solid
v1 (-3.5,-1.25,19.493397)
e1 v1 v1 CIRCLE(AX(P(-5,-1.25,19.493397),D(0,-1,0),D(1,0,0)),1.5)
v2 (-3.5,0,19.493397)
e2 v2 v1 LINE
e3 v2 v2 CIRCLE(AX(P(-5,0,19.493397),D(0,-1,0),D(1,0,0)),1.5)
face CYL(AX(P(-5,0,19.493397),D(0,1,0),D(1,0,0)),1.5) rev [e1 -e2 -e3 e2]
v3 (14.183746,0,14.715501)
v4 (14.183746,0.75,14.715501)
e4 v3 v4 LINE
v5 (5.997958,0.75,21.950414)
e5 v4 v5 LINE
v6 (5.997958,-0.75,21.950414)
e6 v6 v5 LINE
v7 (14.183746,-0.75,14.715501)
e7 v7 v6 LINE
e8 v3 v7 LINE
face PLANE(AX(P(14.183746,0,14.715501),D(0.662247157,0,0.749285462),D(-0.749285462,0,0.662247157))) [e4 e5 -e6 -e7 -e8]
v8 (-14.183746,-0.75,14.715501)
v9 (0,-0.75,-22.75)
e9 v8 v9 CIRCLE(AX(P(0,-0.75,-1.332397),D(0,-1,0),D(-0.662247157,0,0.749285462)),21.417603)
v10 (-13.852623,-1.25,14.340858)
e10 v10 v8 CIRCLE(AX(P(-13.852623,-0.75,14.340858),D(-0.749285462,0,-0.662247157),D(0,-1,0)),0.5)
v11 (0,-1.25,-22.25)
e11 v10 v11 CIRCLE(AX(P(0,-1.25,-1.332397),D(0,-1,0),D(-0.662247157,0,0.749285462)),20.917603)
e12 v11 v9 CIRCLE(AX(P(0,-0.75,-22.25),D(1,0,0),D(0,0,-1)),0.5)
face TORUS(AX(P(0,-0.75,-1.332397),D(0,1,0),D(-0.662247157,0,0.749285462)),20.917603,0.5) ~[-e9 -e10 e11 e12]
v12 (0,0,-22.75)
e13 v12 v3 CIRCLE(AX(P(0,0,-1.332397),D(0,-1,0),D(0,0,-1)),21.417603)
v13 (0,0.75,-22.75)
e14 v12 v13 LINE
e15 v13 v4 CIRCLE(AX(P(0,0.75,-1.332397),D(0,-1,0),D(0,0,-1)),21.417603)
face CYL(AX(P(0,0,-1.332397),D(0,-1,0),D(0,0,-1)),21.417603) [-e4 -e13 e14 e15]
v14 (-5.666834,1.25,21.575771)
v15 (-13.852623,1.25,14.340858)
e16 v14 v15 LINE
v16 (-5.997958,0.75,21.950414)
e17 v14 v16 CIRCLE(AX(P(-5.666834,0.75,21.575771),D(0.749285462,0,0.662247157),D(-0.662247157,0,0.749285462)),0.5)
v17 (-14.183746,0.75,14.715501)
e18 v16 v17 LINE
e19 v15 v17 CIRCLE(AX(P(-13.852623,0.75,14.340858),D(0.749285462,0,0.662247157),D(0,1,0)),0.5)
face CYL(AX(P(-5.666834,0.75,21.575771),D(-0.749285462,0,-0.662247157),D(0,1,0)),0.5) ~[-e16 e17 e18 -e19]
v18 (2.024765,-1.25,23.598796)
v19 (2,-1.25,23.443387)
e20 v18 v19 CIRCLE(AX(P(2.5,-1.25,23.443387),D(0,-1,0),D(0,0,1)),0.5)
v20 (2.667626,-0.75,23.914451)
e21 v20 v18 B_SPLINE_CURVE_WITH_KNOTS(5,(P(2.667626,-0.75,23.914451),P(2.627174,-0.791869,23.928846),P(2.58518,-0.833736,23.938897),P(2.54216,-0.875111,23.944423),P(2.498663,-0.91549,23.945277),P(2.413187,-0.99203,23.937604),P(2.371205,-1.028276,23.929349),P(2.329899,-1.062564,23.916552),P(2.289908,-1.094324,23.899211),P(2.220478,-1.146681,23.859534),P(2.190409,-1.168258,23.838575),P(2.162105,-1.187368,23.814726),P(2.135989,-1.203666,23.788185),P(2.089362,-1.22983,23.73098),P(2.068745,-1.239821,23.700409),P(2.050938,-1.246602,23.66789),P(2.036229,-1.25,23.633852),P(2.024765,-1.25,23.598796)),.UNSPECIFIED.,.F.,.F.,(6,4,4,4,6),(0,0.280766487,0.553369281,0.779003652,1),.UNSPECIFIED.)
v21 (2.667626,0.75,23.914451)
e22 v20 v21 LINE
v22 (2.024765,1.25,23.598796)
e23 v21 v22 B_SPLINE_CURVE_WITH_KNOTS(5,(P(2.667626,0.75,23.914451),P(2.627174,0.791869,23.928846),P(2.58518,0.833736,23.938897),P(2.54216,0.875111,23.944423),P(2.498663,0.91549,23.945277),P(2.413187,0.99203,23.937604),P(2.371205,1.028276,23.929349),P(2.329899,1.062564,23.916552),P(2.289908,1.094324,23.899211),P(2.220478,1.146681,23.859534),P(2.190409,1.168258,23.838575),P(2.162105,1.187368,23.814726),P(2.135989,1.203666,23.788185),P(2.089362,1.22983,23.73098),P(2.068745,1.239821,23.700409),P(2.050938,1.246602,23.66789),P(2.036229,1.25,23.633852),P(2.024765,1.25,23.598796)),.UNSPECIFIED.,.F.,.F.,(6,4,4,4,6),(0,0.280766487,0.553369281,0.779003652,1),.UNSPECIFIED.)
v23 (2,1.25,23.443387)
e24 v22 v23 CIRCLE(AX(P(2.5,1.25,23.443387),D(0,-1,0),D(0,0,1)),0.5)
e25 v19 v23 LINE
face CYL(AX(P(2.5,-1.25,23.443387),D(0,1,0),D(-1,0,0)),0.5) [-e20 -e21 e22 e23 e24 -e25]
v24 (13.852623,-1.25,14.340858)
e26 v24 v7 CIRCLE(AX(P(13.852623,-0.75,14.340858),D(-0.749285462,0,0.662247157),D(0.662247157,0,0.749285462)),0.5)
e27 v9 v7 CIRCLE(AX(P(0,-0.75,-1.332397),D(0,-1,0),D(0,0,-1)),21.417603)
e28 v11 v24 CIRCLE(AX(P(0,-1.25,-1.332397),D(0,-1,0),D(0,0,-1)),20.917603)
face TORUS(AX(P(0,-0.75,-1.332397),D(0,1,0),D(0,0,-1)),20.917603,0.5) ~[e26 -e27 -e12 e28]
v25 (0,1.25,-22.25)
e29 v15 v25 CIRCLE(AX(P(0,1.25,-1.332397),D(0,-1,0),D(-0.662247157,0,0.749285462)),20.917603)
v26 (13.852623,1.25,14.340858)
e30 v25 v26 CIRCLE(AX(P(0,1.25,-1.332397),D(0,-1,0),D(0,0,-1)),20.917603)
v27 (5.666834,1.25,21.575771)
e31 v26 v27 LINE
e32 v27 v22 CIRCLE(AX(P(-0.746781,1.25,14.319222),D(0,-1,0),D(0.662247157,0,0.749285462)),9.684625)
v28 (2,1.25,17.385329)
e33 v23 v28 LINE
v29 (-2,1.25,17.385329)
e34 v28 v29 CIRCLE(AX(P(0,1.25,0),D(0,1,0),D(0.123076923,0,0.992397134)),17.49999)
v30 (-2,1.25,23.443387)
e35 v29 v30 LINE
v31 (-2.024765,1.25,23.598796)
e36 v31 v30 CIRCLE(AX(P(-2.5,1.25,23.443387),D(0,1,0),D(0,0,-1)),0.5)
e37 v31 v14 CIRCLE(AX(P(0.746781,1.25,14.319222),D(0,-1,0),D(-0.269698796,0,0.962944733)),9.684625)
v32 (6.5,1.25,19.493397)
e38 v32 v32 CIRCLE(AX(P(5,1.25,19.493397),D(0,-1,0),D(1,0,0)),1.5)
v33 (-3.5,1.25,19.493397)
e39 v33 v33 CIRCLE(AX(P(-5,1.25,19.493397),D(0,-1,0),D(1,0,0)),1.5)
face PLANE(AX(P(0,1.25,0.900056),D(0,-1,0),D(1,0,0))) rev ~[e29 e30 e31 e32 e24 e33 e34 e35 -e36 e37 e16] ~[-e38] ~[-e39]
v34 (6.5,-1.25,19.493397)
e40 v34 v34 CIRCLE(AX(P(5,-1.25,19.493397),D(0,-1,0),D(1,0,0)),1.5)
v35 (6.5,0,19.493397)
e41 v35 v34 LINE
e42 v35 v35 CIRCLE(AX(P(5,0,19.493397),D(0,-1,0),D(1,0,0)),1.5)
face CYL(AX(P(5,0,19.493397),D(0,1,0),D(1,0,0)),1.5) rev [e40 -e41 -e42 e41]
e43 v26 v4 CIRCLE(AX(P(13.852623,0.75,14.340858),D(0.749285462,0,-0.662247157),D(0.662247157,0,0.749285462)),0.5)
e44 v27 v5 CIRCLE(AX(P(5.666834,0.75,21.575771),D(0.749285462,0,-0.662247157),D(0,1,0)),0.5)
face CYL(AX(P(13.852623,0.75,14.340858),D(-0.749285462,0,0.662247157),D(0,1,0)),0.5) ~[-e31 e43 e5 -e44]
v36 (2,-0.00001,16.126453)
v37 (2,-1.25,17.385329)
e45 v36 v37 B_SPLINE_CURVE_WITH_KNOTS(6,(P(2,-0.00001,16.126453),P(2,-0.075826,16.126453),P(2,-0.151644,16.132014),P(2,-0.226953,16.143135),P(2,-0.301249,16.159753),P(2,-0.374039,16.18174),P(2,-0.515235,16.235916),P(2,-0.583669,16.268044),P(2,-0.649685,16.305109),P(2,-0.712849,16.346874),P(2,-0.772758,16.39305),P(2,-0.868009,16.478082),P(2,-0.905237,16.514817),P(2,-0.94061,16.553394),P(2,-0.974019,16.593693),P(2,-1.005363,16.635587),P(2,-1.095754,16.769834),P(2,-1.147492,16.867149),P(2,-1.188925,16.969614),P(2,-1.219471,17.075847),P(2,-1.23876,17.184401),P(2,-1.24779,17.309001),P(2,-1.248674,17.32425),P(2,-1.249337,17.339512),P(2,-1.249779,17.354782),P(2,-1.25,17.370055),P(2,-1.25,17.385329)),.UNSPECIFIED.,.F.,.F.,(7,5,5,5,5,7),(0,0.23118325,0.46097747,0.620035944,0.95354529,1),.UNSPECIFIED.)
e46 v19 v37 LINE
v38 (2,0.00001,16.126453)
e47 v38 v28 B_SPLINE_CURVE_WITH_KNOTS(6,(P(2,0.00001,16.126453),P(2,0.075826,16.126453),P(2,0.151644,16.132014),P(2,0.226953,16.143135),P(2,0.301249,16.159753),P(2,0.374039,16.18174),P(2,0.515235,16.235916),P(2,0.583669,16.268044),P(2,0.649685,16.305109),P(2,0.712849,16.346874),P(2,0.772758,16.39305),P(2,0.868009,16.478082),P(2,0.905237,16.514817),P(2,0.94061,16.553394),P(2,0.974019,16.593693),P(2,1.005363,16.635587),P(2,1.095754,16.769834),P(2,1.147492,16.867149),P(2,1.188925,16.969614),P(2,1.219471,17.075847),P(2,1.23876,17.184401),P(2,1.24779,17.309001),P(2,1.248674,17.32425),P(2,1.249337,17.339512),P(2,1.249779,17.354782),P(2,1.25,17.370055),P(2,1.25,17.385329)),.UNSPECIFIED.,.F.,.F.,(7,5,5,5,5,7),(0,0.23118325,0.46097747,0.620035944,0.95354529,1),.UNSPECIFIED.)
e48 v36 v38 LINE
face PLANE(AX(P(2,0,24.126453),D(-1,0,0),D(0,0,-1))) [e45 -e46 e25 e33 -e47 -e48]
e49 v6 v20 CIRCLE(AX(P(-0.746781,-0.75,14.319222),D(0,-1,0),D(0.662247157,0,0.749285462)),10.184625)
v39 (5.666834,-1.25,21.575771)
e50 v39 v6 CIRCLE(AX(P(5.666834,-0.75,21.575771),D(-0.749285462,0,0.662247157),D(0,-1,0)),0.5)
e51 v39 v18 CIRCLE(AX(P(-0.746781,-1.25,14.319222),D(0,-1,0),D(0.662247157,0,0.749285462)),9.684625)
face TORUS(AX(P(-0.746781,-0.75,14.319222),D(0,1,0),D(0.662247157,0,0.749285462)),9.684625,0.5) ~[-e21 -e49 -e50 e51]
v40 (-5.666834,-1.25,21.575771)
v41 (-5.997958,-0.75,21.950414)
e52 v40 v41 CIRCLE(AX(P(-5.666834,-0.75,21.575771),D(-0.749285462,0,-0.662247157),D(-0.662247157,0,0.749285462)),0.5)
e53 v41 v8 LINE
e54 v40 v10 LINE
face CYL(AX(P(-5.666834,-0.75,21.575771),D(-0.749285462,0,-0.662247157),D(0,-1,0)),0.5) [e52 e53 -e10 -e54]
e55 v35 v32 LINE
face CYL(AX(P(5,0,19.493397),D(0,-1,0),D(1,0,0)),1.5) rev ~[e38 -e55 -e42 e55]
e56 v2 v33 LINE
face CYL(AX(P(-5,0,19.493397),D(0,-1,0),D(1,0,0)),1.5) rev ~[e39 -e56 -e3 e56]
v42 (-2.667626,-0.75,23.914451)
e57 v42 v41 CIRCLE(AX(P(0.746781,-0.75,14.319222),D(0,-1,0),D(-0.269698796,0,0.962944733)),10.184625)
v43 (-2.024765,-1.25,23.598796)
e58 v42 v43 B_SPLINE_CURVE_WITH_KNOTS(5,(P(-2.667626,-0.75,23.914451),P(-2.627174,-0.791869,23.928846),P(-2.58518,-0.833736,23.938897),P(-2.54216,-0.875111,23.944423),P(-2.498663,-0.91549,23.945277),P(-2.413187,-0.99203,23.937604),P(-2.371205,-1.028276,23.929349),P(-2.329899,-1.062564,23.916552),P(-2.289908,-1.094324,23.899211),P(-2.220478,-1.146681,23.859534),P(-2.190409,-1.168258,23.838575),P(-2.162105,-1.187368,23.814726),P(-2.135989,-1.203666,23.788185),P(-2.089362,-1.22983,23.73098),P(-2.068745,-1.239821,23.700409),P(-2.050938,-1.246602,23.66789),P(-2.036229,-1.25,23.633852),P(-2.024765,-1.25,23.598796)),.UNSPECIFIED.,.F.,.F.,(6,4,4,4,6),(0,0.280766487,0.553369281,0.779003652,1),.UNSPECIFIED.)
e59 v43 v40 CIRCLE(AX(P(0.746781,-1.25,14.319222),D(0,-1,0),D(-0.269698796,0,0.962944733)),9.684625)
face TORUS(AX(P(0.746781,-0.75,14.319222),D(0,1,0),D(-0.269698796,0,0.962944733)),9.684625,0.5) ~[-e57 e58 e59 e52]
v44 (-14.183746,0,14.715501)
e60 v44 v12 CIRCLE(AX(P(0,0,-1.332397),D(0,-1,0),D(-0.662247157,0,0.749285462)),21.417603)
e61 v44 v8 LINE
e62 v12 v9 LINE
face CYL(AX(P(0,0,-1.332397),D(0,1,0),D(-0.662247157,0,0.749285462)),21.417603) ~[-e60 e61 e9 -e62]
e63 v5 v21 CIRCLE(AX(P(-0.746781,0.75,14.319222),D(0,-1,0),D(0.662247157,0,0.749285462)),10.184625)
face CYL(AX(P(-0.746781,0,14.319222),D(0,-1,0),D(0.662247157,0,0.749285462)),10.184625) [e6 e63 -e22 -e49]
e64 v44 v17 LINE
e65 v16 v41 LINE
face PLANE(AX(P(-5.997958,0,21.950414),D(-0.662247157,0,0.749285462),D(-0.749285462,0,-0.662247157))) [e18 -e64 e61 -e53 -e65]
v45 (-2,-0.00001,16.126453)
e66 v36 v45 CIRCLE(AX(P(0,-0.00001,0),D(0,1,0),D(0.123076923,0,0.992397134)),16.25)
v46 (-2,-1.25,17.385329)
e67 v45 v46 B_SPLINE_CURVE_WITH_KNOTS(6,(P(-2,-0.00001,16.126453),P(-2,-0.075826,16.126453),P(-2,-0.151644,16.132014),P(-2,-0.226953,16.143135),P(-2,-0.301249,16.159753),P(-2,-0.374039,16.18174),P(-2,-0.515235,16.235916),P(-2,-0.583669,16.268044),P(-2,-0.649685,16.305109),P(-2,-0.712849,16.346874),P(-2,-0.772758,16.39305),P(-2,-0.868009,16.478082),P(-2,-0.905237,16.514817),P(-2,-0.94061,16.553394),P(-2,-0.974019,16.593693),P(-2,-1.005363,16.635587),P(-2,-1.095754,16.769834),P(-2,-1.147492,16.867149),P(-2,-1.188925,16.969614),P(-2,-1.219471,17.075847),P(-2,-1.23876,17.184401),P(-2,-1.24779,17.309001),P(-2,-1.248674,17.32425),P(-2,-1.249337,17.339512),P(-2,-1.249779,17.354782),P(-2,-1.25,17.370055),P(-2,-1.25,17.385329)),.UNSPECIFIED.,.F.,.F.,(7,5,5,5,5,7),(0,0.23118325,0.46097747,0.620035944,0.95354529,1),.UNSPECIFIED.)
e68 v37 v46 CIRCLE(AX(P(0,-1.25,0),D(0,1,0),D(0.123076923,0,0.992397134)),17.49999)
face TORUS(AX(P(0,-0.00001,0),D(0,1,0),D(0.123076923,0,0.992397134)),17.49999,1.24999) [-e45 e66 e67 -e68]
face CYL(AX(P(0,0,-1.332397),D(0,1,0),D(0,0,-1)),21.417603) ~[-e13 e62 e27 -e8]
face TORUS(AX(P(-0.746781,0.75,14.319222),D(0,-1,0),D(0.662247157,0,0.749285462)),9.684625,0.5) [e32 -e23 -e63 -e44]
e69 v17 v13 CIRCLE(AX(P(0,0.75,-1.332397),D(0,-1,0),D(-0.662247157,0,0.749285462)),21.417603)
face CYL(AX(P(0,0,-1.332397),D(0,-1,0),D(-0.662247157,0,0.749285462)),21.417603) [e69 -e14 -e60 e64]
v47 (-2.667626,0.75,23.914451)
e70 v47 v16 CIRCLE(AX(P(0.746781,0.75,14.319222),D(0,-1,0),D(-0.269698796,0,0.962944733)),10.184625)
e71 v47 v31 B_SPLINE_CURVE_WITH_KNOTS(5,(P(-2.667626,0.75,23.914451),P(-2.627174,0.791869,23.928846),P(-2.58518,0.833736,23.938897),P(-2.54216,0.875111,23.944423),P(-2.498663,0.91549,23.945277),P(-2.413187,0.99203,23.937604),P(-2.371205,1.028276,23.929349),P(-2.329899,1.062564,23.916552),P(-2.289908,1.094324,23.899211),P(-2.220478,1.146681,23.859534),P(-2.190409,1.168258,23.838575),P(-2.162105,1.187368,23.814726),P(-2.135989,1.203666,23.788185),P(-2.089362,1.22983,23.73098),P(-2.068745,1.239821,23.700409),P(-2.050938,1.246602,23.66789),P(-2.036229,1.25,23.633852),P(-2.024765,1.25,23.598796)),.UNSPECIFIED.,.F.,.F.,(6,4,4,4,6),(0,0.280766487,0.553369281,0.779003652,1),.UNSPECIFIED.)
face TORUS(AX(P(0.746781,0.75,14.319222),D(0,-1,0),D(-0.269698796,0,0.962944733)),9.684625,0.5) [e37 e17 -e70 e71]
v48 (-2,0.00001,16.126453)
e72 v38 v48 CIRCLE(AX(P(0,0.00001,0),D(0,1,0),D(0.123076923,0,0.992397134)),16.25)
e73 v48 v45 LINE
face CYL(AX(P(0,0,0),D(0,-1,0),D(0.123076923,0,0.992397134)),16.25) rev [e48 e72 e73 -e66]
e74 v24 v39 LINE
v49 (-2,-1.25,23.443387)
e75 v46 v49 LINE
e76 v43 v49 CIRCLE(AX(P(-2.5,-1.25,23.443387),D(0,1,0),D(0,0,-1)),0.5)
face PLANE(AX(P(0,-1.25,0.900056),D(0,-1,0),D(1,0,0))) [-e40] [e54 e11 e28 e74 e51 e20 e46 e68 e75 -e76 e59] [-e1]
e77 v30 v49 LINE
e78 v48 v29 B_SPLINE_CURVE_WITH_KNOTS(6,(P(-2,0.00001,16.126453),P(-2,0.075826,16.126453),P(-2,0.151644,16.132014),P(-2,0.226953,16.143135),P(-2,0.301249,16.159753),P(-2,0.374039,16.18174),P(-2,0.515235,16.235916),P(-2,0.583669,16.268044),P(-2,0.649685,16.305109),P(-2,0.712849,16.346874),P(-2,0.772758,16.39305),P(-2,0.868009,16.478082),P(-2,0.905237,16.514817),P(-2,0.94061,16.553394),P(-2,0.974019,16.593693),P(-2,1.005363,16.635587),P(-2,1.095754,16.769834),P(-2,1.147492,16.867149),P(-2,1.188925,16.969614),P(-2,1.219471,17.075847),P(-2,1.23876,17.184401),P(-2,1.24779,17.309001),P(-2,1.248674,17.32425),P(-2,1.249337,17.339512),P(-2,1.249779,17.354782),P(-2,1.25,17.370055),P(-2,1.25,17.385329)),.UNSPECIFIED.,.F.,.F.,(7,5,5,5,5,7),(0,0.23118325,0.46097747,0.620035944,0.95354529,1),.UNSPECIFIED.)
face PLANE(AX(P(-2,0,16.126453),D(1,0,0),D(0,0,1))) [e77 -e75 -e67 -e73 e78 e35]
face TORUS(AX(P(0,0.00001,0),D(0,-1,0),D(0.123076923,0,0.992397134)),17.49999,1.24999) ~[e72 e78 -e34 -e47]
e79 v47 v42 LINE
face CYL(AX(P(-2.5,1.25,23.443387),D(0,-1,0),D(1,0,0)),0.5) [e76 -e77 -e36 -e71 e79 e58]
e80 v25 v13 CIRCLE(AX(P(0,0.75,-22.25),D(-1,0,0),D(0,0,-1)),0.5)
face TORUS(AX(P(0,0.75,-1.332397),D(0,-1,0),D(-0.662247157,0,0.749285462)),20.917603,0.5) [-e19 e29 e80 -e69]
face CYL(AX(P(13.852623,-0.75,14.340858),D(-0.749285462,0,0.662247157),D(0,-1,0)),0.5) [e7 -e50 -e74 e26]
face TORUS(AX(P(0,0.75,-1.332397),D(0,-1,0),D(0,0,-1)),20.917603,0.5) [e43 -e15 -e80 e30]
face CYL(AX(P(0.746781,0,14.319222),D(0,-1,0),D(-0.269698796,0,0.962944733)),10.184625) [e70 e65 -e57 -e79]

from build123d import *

# Parameters (mm, degrees)
F0_R     = 1.5
F1_DEPTH = 1.25
F2_R     = 1.24999
F3_R     = 0.5


# Not quite as in the source:
# - a fillet or chamfer is up to 0.001 mm smaller than in the source, because OpenCascade refuses the exact size


with BuildPart() as f1:
    # F0 (on Front) → F1 (new body, symmetric)
    with BuildSketch(Plane.XZ):
        with BuildLine():
            ThreePointArc((2, 16.1264534229), (0, -16.25), (-2, 16.1264534229))
            Line((-2, 16.1264534229), (-2, 24.1264534229))
            ThreePointArc((-2, 24.1264534229), (-4.1221023219, 23.2646436342), (-5.9979579511, 21.9504138084))
            Line((-5.9979579511, 21.9504138084), (-14.1837464065, 14.7155008072))
            ThreePointArc((-14.1837464065, 14.7155008072), (-20.0302422156, -8.9154770598), (0, -22.75))
            ThreePointArc((0, -22.75), (20.0302422156, -8.9154770598), (14.1837464065, 14.7155008072))
            Line((14.1837464065, 14.7155008072), (5.9979579511, 21.9504138084))
            ThreePointArc((5.9979579511, 21.9504138084), (4.1221023219, 23.2646436342), (2, 24.1264534229))
            Line((2, 24.1264534229), (2, 16.1264534229))
        make_face()
        with Locations((-5, 19.4933966718)):
            Circle(F0_R, mode=Mode.SUBTRACT)
        with Locations((5, 19.4933966718)):
            Circle(F0_R, mode=Mode.SUBTRACT)
    extrude(amount=F1_DEPTH, both=True)

    # F2 (radius 1.25 in the source; OpenCascade refuses exactly that, so slightly less here)
    f2_edges = [f1.edges().sort_by_distance(p)[0] for p in [
        (0, -1.25, -16.25),
        (0, 1.25, -16.25),
    ]]
    fillet(f2_edges, radius=F2_R)

    # F3
    f3_edges = [f1.edges().sort_by_distance(p)[0] for p in [
        (-20.030242, -1.25, -8.915477),
        (20.030242, -1.25, -8.915477),
        (-20.030242, 1.25, -8.915477),
        (20.030242, 1.25, -8.915477),
        (10.090852, 1.25, 18.332957),
        (10.090852, -1.25, 18.332957),
        (4.122102, -1.25, 23.264644),
        (4.122102, 1.25, 23.264644),
        (2, 0.625, 24.126453),
        (2, -0.625, 24.126453),
        (-10.090852, -1.25, 18.332957),
        (-10.090852, 1.25, 18.332957),
        (-4.122102, -1.25, 23.264644),
        (-4.122102, 1.25, 23.264644),
        (-2, 0.625, 24.126453),
        (-2, -0.625, 24.126453),
    ]]
    fillet(f3_edges, radius=F3_R)


solid = f1.part
